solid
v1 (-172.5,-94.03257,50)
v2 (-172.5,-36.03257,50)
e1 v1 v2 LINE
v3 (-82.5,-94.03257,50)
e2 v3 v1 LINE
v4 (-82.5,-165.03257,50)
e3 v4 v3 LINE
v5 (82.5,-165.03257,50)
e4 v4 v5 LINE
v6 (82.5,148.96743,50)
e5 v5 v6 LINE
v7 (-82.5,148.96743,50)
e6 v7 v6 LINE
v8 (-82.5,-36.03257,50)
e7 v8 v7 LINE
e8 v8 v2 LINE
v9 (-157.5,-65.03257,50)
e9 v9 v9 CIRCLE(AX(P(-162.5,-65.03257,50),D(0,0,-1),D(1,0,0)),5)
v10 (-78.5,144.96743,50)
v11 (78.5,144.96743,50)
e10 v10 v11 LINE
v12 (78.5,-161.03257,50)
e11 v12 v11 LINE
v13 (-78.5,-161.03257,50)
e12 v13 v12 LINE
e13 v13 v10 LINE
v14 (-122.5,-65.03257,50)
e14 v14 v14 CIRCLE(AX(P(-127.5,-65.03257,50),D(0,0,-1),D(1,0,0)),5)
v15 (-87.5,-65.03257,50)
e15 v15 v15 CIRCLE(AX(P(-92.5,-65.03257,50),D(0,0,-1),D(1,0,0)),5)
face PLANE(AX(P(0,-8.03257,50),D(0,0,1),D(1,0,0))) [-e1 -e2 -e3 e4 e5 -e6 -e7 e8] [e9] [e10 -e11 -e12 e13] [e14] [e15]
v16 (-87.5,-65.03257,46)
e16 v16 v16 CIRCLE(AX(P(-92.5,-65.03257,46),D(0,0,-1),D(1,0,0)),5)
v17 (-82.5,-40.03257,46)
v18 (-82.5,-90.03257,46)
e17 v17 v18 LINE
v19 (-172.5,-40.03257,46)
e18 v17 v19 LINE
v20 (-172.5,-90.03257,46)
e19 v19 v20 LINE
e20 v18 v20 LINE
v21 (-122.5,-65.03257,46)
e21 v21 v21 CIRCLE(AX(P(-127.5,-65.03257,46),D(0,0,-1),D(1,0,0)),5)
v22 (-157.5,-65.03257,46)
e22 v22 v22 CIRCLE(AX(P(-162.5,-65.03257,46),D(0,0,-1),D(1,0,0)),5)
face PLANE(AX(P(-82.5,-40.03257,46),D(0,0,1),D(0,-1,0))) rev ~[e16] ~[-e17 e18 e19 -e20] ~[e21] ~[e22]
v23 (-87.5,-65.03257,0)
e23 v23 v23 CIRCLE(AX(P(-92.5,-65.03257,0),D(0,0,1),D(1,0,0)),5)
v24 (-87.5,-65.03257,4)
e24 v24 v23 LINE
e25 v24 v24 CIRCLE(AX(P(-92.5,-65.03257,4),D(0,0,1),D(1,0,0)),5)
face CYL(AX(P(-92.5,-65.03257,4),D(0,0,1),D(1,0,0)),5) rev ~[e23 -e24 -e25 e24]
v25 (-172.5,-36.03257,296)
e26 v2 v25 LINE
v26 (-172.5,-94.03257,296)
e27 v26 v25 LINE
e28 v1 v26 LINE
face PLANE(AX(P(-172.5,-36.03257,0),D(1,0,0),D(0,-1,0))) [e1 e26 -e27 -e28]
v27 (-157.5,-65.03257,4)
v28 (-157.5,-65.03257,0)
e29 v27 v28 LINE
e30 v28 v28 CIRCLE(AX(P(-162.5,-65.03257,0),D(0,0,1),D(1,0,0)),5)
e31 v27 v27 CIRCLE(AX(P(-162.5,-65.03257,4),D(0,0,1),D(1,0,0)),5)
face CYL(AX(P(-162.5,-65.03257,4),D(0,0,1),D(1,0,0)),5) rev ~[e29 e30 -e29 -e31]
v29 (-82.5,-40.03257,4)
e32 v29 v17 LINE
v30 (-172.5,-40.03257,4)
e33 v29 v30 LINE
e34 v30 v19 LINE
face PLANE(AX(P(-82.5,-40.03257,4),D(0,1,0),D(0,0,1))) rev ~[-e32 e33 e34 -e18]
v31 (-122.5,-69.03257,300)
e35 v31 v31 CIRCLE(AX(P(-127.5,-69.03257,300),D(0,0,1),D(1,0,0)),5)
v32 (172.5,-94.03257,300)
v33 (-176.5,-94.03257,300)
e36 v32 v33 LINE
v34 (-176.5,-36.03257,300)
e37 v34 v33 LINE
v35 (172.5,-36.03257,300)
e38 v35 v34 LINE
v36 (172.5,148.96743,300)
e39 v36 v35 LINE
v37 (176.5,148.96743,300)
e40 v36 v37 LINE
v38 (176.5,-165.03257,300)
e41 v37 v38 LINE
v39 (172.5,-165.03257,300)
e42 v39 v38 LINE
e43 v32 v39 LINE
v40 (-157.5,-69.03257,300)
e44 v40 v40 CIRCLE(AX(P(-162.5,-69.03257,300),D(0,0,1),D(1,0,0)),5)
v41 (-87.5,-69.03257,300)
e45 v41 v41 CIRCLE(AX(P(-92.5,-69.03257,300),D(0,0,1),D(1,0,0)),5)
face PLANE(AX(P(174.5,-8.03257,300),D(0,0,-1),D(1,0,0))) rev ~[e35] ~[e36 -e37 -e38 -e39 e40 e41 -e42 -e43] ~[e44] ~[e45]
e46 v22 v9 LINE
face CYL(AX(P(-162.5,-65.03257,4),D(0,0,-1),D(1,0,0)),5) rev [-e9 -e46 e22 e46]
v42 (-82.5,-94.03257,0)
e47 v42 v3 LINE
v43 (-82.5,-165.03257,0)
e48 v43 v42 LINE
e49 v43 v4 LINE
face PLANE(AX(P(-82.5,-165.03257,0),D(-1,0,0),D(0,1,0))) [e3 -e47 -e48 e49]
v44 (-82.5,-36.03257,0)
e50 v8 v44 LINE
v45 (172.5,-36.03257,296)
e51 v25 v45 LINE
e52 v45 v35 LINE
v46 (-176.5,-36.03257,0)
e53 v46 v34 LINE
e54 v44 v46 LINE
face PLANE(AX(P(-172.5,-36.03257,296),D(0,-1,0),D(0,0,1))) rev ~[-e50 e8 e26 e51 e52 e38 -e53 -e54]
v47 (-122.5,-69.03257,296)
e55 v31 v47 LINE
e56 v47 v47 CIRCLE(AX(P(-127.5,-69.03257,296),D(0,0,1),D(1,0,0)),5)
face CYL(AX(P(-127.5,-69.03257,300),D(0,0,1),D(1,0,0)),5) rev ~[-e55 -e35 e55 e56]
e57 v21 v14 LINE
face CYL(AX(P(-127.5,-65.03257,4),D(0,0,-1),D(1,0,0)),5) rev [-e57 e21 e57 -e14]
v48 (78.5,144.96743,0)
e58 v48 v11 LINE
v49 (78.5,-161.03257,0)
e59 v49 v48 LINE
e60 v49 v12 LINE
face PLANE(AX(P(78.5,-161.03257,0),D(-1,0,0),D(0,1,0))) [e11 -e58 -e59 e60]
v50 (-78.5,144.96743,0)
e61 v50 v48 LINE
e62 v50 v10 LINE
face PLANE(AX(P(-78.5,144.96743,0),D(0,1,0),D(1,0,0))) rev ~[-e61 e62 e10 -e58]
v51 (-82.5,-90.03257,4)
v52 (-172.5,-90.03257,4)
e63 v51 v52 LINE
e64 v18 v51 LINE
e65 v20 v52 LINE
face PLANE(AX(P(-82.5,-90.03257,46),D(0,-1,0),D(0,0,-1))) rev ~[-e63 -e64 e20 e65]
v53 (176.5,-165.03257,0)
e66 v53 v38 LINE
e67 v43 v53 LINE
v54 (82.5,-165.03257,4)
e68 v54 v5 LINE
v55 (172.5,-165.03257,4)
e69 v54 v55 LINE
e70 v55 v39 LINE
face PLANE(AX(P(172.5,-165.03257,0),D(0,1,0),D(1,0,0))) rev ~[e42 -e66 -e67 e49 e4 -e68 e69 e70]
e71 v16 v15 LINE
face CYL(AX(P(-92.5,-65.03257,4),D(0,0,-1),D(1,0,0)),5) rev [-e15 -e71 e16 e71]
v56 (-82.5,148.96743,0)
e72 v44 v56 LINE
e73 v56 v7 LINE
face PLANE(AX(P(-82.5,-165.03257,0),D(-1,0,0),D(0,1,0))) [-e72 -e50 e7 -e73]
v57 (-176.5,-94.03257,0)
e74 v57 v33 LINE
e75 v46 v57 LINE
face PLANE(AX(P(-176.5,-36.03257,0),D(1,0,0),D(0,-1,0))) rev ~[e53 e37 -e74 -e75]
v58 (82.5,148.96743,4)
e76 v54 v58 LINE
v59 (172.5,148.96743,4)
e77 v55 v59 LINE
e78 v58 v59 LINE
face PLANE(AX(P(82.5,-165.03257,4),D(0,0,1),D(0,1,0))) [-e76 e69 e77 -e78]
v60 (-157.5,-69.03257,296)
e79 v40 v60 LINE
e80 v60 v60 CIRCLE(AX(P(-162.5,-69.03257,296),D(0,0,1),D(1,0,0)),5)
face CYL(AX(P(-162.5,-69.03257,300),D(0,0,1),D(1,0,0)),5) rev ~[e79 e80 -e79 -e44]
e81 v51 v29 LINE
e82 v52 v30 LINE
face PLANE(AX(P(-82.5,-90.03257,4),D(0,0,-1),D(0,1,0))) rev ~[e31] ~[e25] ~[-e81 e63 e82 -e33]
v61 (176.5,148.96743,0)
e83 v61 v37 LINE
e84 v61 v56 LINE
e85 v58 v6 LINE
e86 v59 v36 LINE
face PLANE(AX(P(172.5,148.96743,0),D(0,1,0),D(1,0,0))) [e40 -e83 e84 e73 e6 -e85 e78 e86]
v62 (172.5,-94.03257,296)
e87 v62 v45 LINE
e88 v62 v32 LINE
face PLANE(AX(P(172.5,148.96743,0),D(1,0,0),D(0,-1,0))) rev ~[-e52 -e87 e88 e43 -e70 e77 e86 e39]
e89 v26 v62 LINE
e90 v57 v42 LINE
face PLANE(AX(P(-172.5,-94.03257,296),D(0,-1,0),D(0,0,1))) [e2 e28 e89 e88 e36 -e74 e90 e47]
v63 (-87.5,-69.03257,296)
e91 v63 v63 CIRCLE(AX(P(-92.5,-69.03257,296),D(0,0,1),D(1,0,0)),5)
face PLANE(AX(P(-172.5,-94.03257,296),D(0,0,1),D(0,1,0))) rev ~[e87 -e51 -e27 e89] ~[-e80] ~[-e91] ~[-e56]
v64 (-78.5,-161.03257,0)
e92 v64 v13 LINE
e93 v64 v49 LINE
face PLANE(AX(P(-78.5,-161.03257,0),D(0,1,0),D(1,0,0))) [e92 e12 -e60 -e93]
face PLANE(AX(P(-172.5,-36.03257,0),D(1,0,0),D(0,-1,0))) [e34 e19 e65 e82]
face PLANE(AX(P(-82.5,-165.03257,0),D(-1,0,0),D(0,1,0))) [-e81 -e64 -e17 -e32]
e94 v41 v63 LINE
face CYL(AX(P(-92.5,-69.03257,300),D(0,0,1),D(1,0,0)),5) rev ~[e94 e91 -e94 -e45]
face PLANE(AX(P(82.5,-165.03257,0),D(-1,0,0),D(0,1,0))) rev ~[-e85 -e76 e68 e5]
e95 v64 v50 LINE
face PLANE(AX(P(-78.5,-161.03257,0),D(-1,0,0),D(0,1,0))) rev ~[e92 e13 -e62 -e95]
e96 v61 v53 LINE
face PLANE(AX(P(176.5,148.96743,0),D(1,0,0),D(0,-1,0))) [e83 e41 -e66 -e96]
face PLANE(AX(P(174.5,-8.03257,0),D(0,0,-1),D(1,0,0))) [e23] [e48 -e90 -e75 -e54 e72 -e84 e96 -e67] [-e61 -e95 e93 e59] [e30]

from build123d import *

# Parameters (mm, degrees)
F0_W          = 165
F0_H          = 314
F0_W_2        = 157
F0_H_2        = 306
F1_DEPTH      = 50
F3_DEPTH      = 90
F4_R          = 5
F5_DEPTH      = 14
F5_DEPTH_BACK = 70
F6_DEPTH      = 50
F7_W          = 4
F7_H          = 58
F8_DEPTH      = 300
F9_W          = 58
F9_H          = 4
F10_DEPTH     = 345
F11_W         = 314
F11_H         = 4
F12_DEPTH     = 90
F13_W         = 4
F13_H         = 314
F14_DEPTH     = 300
F15_R         = 5
F16_DEPTH     = 29


# Not quite as in the source:
# - a feature names something its author has since deleted; it is built from what else it names


with BuildPart() as f1:
    # F0 (on Top) → F1 (new body)
    with BuildSketch(Plane.XY):
        with Locations((0, -8.0325696617)):
            Rectangle(F0_W, F0_H)
        with Locations((0, -8.0325696617)):
            Rectangle(F0_W_2, F0_H_2, mode=Mode.SUBTRACT)
    extrude(amount=F1_DEPTH)

    # F2 (on face) → F3 (join)
    with BuildSketch(Plane(origin=(-82.5, 0, 0), x_dir=(0, -1, 0), z_dir=(-1, 0, 0))):
        Polygon((36.0325696617, 0), (65.0325696617, 0), (65.0325696617, 4), (40.0325696617, 4), (40.0325696617, 46), (65.0325696617, 46), (65.0325696617, 50), (36.0325696617, 50), align=None)
        Polygon((65.0325696617, 4), (65.0325696617, 0), (94.0325696617, 0), (94.0325696617, 50), (65.0325696617, 50), (65.0325696617, 46), (90.0325696617, 46), (90.0325696617, 4), align=None)
    extrude(amount=F3_DEPTH)

    # F4 (on face) → F5 (cut, two sides)
    with BuildSketch(Plane.XY.offset(4)) as f5_sk:
        with Locations((-92.5, -65.0325696617)):
            Circle(F4_R)
        with Locations((-162.5, -65.0325696617)):
            Circle(F4_R)
    extrude(amount=-F5_DEPTH, mode=Mode.SUBTRACT)
    extrude(f5_sk.sketch, amount=F5_DEPTH_BACK, mode=Mode.SUBTRACT)

    # F4 (on face) → F6 (cut)
    with BuildSketch(Plane.XY.offset(4)):
        with Locations((-127.5, -65.0325696617)):
            Circle(F4_R)
    extrude(amount=F6_DEPTH, mode=Mode.SUBTRACT)

    # F7 (on face) → F8 (join)
    with BuildSketch(Plane(origin=(0, 0, 0), x_dir=(1, 0, 0), z_dir=(0, 0, -1))):
        with Locations((-174.5, 65.0325696617)):
            Rectangle(F7_W, F7_H)
    extrude(amount=-F8_DEPTH)

    # F9 (on face) → F10 (join)
    with BuildSketch(Plane.YZ.offset(-172.5)):
        with Locations((-65.0325696617, 298)):
            Rectangle(F9_W, F9_H)
    extrude(amount=F10_DEPTH)

    # F11 (on face) → F12 (join)
    with BuildSketch(Plane.YZ.offset(82.5)):
        with Locations((-8.0325696617, 2)):
            Rectangle(F11_W, F11_H)
    extrude(amount=F12_DEPTH)

    # F13 (on face) → F14 (join)
    with BuildSketch(Plane(origin=(0, 0, 0), x_dir=(1, 0, 0), z_dir=(0, 0, -1))):
        with Locations((174.5, 8.0325696617)):
            Rectangle(F13_W, F13_H)
    extrude(amount=-F14_DEPTH)

    # F15 (on face) → F16 (cut)
    with BuildSketch(Plane.XY.offset(300)):
        with Locations((-92.5, -69.0325696617)):
            Circle(F15_R)
        with Locations((-127.5, -69.0325696617)):
            Circle(F15_R)
        with Locations((-162.5, -69.0325696617)):
            Circle(F15_R)
    extrude(amount=-F16_DEPTH, mode=Mode.SUBTRACT)


solid = f1.part
